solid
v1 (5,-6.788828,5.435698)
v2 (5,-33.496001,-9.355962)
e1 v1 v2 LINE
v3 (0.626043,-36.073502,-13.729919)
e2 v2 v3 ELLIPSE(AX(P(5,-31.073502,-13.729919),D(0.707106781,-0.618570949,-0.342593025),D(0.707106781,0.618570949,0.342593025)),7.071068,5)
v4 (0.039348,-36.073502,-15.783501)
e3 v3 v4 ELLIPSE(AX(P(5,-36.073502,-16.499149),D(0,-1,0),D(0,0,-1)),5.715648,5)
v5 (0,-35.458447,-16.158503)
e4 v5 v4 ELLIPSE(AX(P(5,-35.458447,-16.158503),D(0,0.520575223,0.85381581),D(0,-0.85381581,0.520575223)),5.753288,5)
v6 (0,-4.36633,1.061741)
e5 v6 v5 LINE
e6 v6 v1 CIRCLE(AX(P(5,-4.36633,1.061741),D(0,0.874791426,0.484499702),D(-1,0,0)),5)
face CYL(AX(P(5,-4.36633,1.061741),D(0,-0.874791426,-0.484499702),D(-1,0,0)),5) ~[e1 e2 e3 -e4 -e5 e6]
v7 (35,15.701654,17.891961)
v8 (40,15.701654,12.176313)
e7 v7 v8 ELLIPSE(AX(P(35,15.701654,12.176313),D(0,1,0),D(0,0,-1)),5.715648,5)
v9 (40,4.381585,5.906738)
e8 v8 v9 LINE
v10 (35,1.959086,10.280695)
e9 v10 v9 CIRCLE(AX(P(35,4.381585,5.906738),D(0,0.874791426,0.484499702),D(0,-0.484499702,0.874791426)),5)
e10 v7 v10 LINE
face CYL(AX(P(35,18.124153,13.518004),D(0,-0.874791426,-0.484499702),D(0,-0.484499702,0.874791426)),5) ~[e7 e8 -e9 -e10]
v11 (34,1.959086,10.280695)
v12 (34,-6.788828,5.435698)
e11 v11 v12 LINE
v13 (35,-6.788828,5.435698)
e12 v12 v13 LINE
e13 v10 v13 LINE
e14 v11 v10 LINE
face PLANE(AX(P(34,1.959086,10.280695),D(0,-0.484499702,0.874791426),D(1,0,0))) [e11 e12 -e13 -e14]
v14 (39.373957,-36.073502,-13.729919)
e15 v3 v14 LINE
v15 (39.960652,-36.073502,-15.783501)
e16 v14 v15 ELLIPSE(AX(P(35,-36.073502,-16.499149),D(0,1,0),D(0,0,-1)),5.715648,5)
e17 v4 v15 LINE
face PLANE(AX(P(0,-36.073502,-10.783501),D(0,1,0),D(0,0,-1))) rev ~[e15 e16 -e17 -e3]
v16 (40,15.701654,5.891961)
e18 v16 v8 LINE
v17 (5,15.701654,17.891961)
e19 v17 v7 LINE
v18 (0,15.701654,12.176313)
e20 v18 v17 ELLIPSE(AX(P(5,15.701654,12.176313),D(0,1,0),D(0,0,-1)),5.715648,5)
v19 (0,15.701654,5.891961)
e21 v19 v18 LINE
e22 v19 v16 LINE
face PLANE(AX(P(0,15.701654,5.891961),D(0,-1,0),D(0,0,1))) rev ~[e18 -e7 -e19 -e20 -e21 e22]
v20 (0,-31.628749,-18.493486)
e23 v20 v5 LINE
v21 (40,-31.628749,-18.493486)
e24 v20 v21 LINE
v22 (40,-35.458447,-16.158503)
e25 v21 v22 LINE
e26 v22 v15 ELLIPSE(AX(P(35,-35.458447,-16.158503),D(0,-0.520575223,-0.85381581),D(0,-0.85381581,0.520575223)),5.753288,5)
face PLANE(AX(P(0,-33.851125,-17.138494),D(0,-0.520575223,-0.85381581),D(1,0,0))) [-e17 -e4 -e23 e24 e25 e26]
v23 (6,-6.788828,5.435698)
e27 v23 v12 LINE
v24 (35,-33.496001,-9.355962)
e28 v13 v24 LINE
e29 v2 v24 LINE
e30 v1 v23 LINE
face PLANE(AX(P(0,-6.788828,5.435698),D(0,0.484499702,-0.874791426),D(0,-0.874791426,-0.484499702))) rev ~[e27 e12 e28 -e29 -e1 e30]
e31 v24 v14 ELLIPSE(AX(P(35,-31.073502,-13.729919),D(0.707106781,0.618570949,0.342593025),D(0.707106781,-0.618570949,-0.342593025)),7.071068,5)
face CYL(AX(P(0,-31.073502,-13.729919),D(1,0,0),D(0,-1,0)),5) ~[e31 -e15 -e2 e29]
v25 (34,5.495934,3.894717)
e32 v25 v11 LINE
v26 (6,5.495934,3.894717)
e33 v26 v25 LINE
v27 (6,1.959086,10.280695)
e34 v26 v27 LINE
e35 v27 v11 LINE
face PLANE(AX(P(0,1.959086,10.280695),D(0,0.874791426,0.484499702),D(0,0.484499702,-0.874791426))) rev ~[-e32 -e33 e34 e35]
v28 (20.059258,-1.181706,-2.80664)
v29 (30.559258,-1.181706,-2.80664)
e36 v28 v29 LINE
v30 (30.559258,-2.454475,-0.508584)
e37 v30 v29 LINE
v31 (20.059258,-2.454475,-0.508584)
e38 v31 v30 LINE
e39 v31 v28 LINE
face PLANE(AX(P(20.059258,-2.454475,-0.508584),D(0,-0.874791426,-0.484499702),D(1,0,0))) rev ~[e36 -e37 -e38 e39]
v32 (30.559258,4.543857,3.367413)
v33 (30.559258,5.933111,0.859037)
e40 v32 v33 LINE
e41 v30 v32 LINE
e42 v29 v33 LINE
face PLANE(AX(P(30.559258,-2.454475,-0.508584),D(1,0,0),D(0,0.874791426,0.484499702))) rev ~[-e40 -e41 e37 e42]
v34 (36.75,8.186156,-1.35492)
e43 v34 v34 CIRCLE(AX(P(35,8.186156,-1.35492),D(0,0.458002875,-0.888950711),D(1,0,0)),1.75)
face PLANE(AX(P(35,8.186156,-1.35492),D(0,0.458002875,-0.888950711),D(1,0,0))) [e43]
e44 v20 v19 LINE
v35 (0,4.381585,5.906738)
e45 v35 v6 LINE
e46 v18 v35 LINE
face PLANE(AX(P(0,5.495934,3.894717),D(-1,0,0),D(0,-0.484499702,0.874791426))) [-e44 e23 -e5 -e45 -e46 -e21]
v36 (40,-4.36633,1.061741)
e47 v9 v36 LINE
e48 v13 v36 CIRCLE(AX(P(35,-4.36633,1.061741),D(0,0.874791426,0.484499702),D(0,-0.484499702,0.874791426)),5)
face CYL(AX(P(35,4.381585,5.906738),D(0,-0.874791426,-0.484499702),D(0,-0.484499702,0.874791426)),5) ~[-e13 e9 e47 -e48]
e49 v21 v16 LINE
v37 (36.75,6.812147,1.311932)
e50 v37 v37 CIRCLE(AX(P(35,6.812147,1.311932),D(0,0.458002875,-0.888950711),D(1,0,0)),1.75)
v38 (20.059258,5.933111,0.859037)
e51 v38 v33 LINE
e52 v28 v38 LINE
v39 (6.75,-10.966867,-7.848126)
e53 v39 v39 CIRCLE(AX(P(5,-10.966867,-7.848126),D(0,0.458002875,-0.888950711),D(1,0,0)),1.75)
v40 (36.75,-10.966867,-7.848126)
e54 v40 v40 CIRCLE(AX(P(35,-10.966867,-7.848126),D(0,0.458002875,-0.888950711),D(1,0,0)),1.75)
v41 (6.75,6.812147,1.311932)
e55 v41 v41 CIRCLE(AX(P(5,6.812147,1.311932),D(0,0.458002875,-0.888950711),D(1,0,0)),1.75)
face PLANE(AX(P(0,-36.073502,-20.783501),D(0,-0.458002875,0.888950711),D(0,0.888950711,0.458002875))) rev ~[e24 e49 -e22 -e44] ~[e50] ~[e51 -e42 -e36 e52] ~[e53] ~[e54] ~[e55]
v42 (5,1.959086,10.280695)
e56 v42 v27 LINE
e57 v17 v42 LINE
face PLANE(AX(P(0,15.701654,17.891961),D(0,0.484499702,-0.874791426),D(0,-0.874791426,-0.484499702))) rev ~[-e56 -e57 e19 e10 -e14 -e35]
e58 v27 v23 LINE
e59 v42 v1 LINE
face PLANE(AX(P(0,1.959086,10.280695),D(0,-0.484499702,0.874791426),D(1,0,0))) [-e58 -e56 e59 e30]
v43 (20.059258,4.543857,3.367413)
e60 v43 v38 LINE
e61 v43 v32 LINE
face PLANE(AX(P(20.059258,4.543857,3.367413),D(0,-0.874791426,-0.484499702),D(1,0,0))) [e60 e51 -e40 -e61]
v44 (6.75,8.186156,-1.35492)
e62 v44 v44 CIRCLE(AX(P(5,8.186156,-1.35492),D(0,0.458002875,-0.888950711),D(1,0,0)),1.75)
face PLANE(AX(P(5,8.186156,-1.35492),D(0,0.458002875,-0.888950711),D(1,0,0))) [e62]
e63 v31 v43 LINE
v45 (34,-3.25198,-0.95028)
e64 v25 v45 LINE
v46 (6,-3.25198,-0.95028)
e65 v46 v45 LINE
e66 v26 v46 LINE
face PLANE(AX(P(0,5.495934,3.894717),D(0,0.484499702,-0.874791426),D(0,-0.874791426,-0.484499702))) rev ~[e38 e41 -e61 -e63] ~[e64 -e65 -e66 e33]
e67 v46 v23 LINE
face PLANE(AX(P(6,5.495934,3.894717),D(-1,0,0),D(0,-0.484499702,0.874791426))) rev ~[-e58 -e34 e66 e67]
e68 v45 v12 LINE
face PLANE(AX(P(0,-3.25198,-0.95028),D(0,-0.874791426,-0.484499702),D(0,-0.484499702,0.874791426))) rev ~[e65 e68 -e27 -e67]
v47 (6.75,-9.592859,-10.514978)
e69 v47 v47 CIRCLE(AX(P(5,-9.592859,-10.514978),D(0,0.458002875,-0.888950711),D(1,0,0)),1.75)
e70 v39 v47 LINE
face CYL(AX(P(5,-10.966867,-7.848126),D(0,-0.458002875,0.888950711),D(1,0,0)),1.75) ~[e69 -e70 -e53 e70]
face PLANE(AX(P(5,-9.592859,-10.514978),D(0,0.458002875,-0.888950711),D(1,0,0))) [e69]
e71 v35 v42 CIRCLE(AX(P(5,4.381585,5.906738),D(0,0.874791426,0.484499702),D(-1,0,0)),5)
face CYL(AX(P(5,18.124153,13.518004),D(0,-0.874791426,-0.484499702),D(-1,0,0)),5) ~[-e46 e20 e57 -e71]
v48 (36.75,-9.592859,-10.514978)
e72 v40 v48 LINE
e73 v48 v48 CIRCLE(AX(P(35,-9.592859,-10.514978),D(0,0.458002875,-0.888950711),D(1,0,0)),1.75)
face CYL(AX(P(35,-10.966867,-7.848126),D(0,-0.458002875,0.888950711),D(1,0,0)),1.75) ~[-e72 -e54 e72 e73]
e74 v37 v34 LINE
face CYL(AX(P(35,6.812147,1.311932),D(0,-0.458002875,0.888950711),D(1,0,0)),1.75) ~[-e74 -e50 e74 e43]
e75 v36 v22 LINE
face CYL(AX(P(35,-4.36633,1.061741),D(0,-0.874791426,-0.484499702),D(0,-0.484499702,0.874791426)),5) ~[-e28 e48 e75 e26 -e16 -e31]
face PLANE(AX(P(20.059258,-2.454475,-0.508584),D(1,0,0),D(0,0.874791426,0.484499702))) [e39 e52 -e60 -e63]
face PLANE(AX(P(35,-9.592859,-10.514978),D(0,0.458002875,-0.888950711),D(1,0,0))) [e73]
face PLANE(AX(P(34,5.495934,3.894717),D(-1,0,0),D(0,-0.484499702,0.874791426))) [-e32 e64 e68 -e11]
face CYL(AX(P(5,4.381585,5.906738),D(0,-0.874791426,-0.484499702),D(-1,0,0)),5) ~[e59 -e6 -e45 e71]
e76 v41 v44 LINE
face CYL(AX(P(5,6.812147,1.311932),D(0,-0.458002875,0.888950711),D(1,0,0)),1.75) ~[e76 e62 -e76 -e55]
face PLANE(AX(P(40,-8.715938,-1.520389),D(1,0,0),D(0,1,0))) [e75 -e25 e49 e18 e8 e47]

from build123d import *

# Parameters (mm, degrees)
F1_DEPTH = 40
F2_W     = 6
F2_H     = 7.3
F3_DEPTH = 10
F4_W     = 10.5
F4_H     = 8
F5_DEPTH = 25
F6_R     = 1.75
F7_DEPTH = 3
F8_R     = 5
F9_SIZE  = 5


with BuildPart() as f1:
    # F0 (on Right) → F1 (new body)
    with BuildSketch(Plane.YZ):
        Polygon((15.7016541125, 5.8919606872), (15.7016541125, 17.8919606872), (1.959085995, 10.2806947738), (5.4959338209, 3.8947173658), (-3.2519804366, -0.9502796561), (-6.7888282626, 5.435697752), (-36.0735021532, -10.7835007459), (-36.0735021532, -20.7835007459), align=None)
    extrude(amount=F1_DEPTH)

    # F2 (on face) → F3 (join, through all)
    with BuildSketch(Plane(origin=(0, 5.8565406788, 3.2436214293), x_dir=(1, 0, 0), z_dir=(0, -0.8747914258, -0.4844997022))):
        with Locations((3, 4.3942870579)):
            Rectangle(F2_W, F2_H)
        with Locations((37, 4.3942870579)):
            Rectangle(F2_W, F2_H)
    extrude(amount=F3_DEPTH)

    # F4 (on face) → F5 (cut)
    with BuildSketch(Plane(origin=(0, -0.3606068579, 0.6510959365), x_dir=(1, 0, 0), z_dir=(0, -0.4844997022, 0.8747914258))):
        with Locations((25.3092581406, 1.6064377211)):
            Rectangle(F4_W, F4_H)
    extrude(amount=-F5_DEPTH, mode=Mode.SUBTRACT)

    # F6 (on face) → F7 (join)
    with BuildSketch(Plane(origin=(0, 0.8948185727, -1.7367786325), x_dir=(1, 0, 0), z_dir=(0, 0.4580028747, -0.8889507111))):
        with Locations((35, -6.656531521)):
            Circle(F6_R)
        with Locations((5, -6.656531521)):
            Circle(F6_R)
        with Locations((35, 13.343468479)):
            Circle(F6_R)
        with Locations((5, 13.343468479)):
            Circle(F6_R)
    extrude(amount=F7_DEPTH)

    # F8
    f8_edges = [f1.edges().sort_by_distance(p)[0] for p in [
        (20, -36.073502, -10.783501),
        (40, -10.185924, 3.55423),
        (0, -10.185924, 3.55423),
    ]]
    fillet(f8_edges, radius=F8_R)

    # F9
    f9_edges = [f1.edges().sort_by_distance(p)[0] for p in [
        (20, -36.073502, -20.783501),
    ]]
    chamfer(f9_edges, length=F9_SIZE)


solid = f1.part
